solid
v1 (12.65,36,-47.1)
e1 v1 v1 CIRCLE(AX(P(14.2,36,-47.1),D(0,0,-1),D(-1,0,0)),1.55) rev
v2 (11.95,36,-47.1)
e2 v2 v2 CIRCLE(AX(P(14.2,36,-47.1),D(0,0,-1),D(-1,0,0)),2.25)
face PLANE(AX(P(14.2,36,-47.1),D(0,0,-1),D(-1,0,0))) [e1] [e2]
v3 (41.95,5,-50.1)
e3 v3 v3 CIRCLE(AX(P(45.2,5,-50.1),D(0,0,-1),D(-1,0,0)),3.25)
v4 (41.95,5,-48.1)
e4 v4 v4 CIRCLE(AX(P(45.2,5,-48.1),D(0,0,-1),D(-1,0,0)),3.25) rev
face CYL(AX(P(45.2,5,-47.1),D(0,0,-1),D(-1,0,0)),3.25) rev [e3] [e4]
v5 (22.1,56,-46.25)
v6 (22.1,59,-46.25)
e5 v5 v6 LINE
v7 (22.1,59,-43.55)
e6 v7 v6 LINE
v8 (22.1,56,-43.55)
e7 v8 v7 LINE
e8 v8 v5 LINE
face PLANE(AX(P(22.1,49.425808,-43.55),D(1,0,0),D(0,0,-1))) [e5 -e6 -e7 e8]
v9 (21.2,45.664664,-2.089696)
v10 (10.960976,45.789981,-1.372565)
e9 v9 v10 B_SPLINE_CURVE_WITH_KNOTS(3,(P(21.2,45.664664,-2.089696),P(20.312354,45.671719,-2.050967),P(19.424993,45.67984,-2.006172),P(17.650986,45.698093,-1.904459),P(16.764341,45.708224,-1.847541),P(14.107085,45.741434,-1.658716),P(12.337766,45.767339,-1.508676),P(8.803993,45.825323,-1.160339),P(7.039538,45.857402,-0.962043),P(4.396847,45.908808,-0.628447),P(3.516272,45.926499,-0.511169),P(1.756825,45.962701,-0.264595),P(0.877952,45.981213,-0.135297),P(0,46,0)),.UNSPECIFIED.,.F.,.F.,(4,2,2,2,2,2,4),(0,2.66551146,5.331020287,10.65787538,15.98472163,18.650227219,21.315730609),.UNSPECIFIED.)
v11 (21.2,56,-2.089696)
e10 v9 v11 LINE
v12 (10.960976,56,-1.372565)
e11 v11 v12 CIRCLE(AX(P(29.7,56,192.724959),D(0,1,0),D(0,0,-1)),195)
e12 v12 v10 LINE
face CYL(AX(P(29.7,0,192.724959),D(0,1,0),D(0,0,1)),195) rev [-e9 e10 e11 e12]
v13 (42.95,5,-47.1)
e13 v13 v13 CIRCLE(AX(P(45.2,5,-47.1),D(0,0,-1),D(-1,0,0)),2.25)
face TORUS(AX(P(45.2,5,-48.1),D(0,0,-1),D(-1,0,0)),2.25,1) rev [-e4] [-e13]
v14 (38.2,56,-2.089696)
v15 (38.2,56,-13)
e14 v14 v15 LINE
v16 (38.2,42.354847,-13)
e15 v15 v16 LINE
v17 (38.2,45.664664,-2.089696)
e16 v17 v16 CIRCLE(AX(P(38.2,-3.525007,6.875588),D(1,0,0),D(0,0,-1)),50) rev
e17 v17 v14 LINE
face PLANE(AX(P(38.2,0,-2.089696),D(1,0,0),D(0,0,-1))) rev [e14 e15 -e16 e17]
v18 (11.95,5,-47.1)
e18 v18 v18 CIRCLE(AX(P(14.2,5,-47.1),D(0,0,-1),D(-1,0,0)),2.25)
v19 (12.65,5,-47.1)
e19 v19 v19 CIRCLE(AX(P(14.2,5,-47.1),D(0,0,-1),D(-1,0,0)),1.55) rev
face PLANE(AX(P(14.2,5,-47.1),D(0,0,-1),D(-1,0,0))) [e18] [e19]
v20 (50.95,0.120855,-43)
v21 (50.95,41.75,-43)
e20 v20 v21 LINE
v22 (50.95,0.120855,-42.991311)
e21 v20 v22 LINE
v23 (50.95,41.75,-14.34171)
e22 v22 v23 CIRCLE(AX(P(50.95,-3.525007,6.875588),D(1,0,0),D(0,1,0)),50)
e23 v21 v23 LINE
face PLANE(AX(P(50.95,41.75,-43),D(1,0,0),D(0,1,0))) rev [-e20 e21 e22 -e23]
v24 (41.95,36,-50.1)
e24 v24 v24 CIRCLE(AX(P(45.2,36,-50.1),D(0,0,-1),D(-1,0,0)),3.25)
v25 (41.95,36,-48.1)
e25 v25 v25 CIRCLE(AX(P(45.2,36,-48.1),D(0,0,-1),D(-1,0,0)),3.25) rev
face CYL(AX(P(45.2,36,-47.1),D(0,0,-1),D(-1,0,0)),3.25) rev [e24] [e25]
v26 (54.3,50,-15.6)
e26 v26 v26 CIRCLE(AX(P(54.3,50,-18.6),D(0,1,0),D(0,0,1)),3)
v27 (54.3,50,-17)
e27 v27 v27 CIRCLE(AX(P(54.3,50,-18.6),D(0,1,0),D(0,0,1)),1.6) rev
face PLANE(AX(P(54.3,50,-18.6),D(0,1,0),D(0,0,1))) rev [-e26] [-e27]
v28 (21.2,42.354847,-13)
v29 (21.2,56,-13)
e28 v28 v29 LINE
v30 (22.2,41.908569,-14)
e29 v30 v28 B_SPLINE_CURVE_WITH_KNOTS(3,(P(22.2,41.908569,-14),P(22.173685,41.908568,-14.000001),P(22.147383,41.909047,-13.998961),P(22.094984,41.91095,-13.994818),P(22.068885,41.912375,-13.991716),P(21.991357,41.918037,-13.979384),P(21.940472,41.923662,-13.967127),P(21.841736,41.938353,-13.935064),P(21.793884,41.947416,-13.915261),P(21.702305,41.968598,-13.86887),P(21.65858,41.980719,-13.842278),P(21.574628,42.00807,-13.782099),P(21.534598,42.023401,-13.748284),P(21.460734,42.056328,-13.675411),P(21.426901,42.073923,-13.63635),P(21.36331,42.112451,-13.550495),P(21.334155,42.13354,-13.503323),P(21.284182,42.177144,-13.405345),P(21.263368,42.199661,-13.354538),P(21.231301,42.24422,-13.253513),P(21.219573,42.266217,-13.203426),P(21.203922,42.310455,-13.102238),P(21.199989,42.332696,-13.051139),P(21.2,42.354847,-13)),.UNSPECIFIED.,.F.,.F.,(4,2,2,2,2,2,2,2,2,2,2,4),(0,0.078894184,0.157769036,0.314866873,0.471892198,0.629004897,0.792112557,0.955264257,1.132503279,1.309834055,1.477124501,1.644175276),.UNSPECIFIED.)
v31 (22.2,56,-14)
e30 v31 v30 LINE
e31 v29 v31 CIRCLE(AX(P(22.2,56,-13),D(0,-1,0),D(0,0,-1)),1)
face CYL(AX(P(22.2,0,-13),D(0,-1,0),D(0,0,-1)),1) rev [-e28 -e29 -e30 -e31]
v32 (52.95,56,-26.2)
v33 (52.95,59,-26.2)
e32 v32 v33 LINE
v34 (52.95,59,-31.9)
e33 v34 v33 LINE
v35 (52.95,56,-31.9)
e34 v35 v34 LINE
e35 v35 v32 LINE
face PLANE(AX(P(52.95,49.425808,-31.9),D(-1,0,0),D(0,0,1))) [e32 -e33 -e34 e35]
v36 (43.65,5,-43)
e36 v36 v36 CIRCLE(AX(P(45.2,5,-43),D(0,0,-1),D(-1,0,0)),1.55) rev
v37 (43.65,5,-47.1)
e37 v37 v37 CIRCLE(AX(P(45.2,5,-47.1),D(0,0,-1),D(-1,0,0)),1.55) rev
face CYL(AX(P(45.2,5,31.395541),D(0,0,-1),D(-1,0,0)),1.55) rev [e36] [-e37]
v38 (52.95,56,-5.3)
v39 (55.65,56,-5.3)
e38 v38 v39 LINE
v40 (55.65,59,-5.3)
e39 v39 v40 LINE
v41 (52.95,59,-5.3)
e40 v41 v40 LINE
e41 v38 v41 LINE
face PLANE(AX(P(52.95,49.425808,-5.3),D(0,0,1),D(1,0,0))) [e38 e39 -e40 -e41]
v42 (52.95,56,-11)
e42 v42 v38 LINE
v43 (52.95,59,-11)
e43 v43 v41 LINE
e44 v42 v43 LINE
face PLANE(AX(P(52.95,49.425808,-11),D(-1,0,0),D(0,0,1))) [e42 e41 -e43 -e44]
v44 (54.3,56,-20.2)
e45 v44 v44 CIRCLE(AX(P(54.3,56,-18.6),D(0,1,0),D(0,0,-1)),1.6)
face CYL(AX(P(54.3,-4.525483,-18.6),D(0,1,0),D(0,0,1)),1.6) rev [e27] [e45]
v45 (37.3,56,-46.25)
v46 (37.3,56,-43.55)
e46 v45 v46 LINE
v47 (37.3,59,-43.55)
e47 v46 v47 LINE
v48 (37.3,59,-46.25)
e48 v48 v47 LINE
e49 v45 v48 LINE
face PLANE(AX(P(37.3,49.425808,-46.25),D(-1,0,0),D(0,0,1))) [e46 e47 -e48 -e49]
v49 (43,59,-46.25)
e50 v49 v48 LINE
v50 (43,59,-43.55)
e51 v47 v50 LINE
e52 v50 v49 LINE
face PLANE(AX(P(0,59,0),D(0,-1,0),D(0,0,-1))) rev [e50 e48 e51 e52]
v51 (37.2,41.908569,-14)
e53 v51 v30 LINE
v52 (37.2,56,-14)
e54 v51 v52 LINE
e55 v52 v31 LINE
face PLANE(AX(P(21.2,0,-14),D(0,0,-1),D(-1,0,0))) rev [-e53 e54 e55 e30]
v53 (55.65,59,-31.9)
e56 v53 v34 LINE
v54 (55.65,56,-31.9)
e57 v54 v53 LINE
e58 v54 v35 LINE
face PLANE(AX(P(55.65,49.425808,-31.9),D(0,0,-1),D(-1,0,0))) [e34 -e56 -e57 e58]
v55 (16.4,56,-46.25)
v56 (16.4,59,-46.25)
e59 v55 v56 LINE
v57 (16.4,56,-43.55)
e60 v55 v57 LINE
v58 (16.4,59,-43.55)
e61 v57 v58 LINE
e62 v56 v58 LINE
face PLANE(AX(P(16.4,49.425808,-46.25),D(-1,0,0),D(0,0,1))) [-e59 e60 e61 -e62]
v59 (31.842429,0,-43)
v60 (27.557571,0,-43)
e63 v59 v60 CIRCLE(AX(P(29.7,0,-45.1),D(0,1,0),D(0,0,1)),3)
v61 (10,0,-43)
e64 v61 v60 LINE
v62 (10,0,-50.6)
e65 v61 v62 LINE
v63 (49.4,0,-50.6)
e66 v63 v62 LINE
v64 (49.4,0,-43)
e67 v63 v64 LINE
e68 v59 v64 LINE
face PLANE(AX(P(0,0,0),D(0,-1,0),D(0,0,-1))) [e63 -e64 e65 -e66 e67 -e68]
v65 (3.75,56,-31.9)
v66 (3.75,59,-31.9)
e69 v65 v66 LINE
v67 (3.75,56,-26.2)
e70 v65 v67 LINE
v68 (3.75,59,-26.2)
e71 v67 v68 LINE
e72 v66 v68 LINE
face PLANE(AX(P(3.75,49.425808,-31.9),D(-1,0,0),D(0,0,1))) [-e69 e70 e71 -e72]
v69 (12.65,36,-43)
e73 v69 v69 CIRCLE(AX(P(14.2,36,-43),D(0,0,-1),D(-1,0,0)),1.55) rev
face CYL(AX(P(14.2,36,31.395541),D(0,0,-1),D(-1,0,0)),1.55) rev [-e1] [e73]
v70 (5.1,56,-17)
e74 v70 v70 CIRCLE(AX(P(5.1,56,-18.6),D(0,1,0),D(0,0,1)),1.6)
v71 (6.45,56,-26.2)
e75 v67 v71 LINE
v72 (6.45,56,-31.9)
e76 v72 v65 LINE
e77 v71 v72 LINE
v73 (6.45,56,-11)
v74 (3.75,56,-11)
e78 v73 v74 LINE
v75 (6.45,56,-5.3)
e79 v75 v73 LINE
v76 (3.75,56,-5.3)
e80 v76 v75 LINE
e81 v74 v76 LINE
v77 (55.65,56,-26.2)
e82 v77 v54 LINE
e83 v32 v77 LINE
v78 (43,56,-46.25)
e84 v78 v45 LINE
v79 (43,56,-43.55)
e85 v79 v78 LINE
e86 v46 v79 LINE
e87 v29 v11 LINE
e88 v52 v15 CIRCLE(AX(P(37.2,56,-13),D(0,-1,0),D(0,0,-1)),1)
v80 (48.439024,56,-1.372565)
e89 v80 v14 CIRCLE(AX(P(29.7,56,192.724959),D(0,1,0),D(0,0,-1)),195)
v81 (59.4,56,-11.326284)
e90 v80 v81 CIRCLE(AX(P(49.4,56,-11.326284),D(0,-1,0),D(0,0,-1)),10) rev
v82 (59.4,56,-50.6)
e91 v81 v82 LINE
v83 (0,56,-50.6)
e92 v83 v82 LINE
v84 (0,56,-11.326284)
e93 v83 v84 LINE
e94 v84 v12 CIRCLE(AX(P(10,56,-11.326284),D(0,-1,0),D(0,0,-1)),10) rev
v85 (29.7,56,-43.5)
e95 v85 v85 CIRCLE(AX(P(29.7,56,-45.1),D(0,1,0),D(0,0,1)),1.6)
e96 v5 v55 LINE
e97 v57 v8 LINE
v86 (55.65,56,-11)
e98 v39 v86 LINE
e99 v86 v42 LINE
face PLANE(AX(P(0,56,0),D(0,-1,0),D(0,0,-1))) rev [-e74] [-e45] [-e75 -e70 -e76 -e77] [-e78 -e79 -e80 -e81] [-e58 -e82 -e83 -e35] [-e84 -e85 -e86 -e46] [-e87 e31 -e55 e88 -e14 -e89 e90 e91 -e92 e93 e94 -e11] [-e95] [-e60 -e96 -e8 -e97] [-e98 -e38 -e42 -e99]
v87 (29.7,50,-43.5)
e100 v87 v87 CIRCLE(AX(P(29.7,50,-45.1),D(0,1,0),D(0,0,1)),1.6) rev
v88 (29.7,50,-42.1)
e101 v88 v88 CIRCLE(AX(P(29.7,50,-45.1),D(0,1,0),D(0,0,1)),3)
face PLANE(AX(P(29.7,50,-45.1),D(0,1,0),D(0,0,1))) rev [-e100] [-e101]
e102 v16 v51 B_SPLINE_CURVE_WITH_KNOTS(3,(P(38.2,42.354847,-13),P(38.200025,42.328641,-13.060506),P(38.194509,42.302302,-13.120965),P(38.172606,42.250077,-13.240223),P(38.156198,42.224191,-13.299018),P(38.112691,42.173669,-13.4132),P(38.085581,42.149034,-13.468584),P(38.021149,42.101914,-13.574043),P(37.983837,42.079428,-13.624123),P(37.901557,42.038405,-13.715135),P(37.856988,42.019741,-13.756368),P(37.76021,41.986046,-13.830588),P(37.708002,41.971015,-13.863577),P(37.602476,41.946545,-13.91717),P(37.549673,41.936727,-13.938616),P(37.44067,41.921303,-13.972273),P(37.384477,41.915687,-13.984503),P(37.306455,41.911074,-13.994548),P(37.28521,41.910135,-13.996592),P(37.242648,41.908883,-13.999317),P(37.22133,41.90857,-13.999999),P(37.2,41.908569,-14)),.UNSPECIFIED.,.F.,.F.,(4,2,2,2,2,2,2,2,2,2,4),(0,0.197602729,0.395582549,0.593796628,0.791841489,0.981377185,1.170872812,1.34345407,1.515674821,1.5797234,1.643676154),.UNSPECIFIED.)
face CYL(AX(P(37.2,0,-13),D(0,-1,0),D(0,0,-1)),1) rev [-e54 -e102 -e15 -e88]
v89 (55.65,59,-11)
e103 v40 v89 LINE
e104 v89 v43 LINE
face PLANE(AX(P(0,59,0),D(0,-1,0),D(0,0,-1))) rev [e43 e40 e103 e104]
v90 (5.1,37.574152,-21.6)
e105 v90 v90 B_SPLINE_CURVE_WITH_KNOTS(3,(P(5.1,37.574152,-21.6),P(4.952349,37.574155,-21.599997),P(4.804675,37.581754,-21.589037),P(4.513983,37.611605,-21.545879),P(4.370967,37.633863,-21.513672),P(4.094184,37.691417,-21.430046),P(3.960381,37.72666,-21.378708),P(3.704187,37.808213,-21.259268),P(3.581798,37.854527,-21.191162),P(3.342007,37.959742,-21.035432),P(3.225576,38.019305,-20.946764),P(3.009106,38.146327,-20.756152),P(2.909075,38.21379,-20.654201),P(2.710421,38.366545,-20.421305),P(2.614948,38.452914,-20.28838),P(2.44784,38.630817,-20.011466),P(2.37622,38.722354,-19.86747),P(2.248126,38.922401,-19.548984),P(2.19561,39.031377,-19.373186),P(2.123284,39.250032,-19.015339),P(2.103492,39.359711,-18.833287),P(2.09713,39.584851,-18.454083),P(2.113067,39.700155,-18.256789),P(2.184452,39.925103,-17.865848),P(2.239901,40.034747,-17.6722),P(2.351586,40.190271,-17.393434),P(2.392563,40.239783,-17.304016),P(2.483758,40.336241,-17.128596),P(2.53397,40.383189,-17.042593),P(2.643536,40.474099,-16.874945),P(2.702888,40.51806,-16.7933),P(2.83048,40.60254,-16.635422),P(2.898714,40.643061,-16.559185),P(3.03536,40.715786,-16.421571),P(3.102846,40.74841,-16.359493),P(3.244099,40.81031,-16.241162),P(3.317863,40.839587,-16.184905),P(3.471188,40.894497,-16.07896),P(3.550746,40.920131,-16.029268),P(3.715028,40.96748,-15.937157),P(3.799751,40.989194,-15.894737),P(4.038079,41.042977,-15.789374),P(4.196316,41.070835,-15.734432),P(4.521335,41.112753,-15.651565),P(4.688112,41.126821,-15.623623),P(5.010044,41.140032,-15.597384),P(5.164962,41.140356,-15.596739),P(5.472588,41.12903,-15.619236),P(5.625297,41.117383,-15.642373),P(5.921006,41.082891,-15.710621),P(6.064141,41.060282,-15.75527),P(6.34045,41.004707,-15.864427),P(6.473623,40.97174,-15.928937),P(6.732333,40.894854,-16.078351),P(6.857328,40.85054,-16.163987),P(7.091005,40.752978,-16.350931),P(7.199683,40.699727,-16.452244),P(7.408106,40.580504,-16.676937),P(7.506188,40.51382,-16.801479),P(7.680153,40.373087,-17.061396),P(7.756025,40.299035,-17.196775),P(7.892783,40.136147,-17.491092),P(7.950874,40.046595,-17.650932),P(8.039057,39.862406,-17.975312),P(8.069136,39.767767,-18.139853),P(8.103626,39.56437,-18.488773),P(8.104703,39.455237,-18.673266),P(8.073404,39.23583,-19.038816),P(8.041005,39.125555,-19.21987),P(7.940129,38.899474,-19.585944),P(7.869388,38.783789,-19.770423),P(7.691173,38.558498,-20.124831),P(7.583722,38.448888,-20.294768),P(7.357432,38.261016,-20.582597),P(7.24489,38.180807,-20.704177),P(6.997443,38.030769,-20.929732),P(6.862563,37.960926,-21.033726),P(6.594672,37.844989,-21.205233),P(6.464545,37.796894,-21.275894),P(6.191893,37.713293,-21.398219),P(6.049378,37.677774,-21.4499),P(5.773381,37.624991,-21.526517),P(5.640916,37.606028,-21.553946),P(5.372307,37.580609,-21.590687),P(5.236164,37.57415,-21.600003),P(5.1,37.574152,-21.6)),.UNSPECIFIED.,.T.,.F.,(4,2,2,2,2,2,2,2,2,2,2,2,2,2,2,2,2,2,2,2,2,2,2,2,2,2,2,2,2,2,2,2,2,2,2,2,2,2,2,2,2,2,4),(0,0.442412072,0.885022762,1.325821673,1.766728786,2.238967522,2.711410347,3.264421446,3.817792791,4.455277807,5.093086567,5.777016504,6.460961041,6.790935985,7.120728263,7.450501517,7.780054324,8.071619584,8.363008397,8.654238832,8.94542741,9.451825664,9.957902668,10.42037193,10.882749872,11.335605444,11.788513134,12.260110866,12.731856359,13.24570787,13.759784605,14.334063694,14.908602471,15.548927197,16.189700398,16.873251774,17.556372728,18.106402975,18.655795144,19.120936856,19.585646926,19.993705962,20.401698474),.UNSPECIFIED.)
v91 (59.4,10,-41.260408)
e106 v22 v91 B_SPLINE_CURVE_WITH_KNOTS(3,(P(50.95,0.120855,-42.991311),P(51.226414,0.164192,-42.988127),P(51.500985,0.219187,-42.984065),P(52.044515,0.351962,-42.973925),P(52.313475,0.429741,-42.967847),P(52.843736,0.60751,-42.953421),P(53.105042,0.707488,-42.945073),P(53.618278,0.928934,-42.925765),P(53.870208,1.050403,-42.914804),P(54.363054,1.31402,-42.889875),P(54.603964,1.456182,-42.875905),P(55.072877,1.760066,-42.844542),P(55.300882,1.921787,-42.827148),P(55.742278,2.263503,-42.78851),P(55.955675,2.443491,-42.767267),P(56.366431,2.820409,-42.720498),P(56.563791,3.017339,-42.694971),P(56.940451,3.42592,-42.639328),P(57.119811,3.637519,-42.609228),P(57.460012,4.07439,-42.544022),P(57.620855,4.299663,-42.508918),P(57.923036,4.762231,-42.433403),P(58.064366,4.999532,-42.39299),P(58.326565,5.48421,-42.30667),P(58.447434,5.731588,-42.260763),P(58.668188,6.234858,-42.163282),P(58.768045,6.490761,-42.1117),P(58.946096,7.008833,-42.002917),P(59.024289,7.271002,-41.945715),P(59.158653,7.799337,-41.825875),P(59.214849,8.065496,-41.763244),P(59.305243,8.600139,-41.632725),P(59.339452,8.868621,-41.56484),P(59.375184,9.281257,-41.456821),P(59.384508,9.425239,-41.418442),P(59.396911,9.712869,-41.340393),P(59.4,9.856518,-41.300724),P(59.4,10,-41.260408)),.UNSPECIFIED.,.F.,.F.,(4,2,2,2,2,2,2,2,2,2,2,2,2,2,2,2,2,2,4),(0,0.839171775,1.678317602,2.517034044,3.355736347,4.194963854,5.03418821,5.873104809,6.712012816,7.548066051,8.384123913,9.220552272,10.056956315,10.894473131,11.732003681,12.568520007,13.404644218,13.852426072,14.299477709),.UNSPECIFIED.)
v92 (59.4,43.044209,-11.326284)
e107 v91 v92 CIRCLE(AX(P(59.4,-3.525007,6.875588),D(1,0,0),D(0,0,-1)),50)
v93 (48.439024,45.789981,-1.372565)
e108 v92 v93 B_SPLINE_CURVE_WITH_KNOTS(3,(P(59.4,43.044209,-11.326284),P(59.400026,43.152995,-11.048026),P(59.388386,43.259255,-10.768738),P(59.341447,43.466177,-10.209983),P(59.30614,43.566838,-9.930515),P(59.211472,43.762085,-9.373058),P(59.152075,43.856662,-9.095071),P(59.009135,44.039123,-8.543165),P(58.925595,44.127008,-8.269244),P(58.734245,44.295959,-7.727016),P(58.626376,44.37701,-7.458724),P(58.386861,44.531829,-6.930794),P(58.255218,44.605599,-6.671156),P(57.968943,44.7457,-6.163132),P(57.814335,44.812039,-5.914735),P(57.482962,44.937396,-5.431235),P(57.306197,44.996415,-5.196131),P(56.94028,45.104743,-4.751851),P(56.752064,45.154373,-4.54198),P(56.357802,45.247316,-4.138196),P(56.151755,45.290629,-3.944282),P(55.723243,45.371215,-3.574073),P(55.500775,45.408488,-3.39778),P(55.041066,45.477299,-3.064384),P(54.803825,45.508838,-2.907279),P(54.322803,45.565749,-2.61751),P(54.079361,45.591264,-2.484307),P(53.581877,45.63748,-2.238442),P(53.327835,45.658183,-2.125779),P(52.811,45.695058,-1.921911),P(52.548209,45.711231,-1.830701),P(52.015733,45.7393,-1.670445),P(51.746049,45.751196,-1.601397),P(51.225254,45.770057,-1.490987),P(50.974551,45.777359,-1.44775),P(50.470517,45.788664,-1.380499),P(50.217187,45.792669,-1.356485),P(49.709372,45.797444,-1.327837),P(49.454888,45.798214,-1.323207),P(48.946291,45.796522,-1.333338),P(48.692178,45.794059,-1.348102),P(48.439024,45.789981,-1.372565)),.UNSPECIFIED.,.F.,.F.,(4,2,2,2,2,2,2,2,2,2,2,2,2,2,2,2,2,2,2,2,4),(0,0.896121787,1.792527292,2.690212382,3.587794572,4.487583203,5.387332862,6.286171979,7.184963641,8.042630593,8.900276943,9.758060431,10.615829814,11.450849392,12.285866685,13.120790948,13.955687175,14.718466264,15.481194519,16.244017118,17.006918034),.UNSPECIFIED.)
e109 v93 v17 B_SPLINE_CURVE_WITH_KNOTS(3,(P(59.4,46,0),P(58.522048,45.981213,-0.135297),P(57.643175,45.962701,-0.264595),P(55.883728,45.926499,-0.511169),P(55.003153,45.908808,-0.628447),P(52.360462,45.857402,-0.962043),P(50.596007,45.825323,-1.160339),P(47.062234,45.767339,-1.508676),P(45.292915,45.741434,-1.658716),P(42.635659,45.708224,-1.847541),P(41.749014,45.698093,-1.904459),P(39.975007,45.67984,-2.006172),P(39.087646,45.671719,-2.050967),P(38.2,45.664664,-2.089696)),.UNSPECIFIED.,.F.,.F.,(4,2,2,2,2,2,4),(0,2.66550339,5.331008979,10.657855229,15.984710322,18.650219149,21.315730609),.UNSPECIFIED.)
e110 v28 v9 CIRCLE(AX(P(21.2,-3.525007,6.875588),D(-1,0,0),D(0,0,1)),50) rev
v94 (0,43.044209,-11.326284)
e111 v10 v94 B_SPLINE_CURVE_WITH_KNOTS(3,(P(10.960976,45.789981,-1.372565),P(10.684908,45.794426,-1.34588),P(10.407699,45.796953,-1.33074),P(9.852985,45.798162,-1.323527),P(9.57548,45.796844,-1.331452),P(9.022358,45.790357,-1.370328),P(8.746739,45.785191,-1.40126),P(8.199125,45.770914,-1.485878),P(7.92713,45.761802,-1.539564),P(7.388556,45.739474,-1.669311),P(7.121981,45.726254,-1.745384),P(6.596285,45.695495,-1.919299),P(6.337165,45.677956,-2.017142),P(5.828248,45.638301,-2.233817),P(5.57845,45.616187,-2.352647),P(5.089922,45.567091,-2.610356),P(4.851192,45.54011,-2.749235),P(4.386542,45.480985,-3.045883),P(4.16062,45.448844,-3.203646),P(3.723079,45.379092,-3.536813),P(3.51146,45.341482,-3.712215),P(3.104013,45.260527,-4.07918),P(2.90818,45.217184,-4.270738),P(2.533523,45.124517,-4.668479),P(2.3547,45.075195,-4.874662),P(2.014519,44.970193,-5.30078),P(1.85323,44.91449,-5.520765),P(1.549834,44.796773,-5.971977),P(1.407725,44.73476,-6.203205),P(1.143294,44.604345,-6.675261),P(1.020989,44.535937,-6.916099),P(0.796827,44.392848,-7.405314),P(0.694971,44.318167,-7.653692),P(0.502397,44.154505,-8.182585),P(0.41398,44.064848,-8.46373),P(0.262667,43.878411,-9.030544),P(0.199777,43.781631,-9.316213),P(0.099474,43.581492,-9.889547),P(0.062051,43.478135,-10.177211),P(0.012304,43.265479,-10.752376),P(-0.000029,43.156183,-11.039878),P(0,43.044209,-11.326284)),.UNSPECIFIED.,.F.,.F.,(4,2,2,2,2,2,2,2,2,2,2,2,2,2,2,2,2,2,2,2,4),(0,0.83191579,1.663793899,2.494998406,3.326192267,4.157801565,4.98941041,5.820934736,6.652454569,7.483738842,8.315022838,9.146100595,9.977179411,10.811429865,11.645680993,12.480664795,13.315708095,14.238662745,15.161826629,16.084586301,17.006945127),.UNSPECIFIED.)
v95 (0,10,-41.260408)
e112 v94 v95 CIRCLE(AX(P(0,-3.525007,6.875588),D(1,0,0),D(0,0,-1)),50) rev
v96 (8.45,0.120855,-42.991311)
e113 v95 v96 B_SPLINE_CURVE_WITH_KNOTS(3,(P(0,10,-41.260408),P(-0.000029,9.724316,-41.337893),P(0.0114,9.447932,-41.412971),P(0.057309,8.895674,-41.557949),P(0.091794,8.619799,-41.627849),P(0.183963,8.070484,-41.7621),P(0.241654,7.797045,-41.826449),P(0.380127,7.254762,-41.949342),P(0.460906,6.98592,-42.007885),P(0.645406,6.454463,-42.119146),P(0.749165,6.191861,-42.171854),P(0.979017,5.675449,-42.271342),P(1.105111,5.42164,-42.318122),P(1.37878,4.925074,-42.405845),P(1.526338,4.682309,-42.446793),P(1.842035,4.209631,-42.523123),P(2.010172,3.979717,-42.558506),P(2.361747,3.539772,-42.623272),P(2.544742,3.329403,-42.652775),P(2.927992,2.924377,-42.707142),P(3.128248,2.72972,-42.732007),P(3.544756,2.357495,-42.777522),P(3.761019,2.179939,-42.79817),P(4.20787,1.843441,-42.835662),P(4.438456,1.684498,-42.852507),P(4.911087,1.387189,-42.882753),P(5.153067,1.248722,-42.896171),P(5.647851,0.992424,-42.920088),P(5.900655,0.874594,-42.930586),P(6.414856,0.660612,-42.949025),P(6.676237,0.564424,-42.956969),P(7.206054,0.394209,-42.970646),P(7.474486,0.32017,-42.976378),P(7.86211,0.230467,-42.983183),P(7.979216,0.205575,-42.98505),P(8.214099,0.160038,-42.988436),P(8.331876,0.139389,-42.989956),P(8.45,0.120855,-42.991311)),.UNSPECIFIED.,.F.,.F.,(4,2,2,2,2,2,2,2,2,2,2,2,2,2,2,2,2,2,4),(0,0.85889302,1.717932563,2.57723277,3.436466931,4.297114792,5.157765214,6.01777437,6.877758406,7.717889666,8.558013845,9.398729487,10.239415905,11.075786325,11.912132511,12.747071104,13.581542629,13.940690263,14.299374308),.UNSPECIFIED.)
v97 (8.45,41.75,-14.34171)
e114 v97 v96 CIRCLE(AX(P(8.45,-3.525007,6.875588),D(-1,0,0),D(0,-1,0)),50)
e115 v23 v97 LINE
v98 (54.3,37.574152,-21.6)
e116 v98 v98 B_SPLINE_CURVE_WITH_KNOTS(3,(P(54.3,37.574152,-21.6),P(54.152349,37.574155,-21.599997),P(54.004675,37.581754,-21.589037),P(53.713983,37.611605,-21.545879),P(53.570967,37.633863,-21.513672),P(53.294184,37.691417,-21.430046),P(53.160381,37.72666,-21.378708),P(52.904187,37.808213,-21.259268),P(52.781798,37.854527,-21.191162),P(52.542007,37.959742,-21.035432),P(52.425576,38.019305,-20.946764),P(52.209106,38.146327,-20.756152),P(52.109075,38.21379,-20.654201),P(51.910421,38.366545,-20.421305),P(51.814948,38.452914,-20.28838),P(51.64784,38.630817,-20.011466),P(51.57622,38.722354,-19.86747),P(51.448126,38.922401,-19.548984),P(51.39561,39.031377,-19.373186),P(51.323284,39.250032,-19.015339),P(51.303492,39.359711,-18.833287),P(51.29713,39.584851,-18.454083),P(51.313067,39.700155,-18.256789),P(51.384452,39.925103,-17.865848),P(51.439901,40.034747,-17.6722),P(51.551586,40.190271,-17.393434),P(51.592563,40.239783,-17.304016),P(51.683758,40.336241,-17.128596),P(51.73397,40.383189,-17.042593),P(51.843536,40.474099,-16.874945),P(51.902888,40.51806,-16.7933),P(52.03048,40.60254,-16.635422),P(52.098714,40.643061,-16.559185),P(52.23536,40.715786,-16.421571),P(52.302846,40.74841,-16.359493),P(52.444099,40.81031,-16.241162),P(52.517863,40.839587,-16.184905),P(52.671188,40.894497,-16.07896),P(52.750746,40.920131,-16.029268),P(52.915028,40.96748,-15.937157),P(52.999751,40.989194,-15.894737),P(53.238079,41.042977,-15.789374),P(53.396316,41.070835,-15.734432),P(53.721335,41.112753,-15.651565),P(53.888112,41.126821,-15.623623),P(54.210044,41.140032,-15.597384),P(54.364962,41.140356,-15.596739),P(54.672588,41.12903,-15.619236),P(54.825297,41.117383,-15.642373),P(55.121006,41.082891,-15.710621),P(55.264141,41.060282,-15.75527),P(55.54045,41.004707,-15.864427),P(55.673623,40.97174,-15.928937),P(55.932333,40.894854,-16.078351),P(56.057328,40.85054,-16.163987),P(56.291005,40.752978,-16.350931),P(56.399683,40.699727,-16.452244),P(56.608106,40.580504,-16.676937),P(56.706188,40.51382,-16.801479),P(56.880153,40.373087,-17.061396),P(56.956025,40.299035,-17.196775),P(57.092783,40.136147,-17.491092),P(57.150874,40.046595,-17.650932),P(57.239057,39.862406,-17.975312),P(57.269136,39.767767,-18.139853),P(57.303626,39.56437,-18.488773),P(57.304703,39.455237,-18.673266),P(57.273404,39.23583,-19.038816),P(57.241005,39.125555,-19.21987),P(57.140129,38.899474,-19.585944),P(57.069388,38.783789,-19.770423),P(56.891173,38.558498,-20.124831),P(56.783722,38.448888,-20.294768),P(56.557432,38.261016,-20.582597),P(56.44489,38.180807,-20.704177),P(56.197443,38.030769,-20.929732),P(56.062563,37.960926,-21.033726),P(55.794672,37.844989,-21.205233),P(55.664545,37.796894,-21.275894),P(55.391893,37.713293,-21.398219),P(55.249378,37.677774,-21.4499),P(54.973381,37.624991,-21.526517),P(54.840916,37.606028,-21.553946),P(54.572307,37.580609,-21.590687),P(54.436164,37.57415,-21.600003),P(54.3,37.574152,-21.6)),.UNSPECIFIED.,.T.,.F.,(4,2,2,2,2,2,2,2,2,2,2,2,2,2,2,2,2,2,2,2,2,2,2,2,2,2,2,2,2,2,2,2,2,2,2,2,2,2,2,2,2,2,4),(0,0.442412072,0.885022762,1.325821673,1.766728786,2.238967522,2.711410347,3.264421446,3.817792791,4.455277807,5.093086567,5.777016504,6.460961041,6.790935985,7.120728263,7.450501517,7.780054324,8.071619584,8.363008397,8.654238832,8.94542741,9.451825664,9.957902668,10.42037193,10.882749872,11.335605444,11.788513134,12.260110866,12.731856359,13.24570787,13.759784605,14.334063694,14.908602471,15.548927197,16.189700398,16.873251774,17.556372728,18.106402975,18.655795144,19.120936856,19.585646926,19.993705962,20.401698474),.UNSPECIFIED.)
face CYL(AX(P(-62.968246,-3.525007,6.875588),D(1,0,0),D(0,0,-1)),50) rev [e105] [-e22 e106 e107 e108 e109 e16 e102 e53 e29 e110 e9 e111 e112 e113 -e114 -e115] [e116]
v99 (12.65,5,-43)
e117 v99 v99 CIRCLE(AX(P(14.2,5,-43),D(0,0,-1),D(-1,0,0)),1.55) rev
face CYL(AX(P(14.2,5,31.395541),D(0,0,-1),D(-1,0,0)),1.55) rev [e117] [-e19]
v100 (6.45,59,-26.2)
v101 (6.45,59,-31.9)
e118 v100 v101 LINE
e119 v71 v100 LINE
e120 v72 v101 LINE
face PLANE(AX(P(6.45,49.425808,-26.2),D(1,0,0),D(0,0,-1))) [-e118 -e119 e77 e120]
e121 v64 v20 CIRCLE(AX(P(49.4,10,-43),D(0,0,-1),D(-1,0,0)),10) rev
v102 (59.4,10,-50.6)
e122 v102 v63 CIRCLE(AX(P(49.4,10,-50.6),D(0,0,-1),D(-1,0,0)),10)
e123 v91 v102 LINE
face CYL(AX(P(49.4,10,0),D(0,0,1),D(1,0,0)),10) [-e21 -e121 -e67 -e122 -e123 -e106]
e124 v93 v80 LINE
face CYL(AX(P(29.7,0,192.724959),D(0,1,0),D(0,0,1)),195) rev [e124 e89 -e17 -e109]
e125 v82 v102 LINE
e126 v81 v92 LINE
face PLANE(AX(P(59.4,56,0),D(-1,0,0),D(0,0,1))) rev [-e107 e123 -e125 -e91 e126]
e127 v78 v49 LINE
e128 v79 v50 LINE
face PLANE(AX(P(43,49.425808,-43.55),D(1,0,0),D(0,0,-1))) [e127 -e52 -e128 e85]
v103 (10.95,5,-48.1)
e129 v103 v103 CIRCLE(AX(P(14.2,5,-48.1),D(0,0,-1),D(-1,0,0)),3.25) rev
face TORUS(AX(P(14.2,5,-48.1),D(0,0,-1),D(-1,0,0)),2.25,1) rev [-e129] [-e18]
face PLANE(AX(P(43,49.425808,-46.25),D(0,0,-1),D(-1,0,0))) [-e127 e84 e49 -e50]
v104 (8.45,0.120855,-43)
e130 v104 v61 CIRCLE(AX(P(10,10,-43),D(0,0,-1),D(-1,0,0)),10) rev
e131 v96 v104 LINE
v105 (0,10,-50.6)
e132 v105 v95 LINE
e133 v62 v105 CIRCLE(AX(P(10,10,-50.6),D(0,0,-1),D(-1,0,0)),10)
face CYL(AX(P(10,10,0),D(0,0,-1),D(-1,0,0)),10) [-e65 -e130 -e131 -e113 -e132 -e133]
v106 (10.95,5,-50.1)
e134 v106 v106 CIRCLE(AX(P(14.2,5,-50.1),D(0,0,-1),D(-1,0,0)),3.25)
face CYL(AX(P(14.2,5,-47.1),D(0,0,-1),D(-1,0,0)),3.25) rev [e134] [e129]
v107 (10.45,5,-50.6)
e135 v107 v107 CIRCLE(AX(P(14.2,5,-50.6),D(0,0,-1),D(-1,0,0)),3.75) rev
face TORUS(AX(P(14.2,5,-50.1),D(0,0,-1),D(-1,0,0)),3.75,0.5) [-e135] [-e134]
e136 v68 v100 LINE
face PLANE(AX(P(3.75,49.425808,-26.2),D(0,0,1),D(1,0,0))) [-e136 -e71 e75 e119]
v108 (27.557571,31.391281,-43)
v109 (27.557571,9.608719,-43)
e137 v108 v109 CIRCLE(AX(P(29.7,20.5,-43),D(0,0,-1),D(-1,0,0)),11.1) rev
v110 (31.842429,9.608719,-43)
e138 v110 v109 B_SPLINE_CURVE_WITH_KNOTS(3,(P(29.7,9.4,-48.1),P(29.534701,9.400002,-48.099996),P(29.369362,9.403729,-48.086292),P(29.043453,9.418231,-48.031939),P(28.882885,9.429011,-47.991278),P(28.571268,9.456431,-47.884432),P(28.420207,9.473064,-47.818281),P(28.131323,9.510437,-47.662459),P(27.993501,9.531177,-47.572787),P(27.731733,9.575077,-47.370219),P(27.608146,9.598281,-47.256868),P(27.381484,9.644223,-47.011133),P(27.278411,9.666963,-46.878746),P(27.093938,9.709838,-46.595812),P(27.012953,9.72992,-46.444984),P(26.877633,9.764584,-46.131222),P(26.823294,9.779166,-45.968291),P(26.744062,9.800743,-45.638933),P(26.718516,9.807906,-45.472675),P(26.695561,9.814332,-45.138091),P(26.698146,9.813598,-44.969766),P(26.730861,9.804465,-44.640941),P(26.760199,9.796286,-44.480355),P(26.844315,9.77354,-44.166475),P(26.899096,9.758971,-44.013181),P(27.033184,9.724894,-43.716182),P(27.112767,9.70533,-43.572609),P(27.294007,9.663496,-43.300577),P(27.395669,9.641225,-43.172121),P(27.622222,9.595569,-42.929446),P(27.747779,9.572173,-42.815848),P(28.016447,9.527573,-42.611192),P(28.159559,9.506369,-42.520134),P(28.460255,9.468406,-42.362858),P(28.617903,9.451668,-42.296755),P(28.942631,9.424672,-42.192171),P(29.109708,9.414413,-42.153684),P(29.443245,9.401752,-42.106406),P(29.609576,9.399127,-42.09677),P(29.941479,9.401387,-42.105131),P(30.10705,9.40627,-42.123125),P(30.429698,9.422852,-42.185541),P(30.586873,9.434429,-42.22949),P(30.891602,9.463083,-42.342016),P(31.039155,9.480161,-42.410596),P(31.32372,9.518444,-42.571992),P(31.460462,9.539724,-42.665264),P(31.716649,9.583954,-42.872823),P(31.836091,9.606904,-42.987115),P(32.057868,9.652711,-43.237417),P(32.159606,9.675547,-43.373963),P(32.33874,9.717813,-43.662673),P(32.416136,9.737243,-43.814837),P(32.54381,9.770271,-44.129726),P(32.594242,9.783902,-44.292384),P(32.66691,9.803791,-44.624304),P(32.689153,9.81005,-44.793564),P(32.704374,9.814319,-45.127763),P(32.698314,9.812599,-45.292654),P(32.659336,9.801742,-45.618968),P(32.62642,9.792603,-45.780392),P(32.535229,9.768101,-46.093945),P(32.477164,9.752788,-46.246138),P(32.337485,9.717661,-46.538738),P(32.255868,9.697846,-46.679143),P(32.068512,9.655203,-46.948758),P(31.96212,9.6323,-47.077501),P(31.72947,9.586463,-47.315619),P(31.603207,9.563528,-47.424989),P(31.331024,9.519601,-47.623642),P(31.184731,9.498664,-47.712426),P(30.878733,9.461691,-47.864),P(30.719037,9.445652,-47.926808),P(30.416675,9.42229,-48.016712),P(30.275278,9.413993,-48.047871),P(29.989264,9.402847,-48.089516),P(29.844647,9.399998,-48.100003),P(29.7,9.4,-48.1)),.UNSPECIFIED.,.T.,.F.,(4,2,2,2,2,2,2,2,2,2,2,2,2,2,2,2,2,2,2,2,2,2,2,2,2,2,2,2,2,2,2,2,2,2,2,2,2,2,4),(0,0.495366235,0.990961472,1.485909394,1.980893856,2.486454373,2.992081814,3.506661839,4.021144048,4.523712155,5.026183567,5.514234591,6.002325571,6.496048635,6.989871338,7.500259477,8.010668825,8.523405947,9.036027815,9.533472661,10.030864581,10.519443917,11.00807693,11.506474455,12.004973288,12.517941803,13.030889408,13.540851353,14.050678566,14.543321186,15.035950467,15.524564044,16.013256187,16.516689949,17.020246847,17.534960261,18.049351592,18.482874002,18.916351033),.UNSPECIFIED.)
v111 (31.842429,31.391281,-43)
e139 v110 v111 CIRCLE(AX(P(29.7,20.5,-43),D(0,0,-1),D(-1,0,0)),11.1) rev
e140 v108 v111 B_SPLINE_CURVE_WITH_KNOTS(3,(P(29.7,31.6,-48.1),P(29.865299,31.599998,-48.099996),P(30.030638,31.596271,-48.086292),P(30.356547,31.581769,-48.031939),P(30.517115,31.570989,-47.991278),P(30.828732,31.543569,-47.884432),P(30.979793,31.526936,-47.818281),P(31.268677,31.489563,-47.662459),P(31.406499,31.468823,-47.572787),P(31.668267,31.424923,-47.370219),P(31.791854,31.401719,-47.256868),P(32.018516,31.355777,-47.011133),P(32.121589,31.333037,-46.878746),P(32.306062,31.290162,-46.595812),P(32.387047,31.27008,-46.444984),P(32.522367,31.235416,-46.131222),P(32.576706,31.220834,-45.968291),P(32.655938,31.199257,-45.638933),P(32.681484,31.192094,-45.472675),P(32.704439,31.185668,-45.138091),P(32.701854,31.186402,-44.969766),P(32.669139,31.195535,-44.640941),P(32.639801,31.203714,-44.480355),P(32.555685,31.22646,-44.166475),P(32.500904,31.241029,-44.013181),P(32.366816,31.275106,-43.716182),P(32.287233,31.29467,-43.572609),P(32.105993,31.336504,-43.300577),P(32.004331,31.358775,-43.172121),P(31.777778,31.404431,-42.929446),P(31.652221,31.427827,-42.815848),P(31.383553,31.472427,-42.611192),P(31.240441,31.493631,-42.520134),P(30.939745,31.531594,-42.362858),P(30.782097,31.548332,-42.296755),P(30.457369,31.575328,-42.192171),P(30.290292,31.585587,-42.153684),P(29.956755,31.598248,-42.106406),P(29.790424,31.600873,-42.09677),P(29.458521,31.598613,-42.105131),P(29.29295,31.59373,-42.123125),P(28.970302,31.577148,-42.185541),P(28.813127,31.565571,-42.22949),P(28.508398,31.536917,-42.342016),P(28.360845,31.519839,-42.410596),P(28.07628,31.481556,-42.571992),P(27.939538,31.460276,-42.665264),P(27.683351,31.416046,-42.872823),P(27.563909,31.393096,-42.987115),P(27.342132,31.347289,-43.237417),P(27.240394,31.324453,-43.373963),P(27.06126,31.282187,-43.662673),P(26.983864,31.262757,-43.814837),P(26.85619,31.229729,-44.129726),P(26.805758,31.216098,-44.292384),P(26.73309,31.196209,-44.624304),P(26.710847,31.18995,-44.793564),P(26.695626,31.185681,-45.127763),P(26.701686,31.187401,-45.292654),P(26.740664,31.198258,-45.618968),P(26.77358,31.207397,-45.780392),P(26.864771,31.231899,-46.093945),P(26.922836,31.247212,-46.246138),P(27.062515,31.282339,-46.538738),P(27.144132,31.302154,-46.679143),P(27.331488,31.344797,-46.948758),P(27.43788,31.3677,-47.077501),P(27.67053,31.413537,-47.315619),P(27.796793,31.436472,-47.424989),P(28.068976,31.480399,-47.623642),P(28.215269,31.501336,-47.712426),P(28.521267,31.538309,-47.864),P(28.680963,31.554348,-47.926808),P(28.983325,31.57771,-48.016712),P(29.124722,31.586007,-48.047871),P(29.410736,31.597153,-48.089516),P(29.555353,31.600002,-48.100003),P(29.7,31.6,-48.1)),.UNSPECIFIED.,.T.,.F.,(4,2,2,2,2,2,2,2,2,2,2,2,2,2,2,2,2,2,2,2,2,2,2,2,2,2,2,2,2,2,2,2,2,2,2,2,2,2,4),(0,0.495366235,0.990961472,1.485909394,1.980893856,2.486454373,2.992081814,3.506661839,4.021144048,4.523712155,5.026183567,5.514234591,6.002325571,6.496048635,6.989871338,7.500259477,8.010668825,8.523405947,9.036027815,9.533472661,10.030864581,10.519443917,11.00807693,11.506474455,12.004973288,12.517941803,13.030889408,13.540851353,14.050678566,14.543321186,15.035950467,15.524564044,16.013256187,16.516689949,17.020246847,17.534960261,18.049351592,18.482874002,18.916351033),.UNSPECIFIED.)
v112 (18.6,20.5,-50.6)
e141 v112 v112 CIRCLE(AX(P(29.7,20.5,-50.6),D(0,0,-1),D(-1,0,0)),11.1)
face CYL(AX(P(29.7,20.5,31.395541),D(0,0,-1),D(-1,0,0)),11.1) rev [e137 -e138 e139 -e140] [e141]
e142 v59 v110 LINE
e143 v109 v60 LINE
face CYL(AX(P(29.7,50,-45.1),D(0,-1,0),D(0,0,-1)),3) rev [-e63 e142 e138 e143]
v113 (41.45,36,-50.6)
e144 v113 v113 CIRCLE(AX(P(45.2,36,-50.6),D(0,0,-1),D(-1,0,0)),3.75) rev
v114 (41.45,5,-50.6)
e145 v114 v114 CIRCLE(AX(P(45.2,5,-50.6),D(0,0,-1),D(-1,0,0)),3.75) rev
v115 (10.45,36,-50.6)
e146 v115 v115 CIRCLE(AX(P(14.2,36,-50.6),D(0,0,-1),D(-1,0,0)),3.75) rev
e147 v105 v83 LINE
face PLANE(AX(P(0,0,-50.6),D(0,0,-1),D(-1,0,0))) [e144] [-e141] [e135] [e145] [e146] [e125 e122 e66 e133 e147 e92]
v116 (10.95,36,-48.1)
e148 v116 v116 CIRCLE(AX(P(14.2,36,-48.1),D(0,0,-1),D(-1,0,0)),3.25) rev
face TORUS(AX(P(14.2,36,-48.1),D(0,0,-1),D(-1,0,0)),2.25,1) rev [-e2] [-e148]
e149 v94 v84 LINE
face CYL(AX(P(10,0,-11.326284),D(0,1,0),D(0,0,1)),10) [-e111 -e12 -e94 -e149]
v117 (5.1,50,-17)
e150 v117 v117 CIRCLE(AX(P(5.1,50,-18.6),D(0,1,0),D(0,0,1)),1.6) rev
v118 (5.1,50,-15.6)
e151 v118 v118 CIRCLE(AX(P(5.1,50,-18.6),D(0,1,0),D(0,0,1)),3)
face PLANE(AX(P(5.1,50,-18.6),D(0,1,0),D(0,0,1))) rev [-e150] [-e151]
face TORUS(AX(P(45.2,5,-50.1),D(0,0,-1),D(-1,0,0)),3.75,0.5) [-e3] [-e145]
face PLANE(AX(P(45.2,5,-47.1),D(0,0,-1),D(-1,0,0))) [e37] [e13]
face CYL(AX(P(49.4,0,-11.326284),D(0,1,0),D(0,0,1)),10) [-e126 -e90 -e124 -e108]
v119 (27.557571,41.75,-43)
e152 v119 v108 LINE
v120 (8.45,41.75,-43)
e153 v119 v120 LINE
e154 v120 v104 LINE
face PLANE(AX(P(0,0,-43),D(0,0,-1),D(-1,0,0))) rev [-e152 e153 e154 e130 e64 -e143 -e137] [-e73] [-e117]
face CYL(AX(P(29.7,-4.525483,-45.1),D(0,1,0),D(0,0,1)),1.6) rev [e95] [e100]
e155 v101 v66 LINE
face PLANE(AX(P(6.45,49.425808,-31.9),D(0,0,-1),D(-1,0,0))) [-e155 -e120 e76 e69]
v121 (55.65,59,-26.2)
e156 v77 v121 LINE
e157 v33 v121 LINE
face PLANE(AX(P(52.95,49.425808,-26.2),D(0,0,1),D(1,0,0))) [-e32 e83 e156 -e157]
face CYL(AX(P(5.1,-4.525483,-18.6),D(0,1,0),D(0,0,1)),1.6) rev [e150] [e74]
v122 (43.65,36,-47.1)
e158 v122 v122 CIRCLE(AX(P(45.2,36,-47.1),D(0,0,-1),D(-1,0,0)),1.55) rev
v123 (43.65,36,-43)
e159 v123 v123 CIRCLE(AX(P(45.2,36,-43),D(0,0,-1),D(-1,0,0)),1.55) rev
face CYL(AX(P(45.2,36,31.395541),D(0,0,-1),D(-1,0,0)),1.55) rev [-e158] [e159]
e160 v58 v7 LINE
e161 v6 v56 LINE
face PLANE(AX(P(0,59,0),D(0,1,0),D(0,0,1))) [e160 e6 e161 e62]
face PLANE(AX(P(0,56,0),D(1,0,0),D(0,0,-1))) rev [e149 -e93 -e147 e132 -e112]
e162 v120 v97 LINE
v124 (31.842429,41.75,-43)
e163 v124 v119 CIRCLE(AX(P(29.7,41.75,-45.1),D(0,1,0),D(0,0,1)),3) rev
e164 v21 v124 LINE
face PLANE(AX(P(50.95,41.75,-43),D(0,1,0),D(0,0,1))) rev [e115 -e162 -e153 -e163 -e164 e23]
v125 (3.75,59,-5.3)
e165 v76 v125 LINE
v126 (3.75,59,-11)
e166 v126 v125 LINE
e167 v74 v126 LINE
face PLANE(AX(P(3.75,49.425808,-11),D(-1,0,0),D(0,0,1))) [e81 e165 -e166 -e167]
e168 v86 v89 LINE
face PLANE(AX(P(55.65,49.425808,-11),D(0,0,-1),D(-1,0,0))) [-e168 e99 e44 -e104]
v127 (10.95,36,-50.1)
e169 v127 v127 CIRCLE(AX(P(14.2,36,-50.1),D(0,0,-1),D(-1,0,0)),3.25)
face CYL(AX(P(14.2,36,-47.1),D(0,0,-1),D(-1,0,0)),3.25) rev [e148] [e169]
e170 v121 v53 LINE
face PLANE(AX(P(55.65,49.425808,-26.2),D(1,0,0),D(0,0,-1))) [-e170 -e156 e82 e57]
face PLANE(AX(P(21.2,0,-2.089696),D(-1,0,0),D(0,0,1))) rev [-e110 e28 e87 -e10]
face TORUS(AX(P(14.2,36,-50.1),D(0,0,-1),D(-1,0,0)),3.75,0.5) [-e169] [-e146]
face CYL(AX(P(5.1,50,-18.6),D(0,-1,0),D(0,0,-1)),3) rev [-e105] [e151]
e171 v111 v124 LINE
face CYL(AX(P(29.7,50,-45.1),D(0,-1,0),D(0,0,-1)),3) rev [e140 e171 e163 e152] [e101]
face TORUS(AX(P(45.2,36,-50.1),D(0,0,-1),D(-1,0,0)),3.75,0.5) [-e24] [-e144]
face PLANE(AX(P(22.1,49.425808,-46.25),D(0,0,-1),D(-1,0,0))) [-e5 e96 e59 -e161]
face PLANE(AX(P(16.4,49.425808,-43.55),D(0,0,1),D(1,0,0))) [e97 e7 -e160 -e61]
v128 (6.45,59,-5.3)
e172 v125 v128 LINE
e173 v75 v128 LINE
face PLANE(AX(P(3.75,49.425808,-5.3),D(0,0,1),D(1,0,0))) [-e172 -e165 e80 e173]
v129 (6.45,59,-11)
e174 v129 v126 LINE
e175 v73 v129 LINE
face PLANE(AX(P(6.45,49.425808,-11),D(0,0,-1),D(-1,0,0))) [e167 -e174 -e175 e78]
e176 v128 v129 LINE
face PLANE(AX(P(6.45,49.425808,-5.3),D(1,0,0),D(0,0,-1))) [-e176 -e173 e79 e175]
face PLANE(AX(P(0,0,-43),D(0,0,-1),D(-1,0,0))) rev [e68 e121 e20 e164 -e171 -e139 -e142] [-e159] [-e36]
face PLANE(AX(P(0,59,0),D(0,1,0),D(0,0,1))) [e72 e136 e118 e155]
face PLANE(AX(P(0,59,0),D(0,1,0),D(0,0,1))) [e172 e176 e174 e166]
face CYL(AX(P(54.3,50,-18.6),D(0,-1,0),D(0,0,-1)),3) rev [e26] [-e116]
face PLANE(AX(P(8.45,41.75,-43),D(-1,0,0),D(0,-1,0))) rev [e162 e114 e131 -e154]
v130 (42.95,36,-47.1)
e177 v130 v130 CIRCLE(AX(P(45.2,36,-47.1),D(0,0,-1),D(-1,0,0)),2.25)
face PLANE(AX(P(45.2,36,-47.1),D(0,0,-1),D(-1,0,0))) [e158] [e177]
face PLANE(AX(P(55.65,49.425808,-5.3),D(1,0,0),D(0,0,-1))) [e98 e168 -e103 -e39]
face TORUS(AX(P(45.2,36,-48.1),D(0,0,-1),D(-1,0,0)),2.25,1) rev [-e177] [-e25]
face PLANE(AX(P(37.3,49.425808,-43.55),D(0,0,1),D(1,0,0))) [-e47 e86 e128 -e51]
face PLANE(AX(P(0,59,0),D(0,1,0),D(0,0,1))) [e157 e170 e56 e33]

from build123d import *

# Parameters (mm, degrees)
CROQUIS1_W              = 59.4
CROQUIS1_H              = 48.6
SALIENTE_EXTRUIR1_DEPTH = 56
CROQUIS2_W              = 5.9
CROQUIS2_H              = 2.9
CROQUIS2_W_2            = 2.9
CROQUIS2_H_2            = 5.9
SALIENTE_EXTRUIR2_DEPTH = 3
CROQUIS3_R              = 1.6
CORTAR_EXTRUIR1_DEPTH   = 56
CROQUIS4_R              = 11.1
CROQUIS4_R_2            = 1.55
CORTAR_EXTRUIR2_DEPTH   = 48.6
CROQUIS5_W              = 42.5
CROQUIS5_H              = 42.5
CORTAR_EXTRUIR3_DEPTH   = 43
CROQUIS7_R              = 3
CORTAR_EXTRUIR4_DEPTH   = 50
CORTAR_EXTRUIR5_REACH   = 98.806
CORTAR_EXTRUIR6_DEPTH   = 96.006947287
SALIENTE_EXTRUIR3_START = 2
CROQUIS10_W             = 59.4
CROQUIS10_H             = 56
CROQUIS10_R             = 1.55
CROQUIS10_R_2           = 11.1
SALIENTE_EXTRUIR3_DEPTH = 2
REDONDEO1_R             = 10
REDONDEO2_R             = 10
REDONDEO3_R             = 1
CROQUIS11_R             = 3.25
CORTAR_EXTRUIR7_DEPTH   = 3.5
REDONDEO4_R             = 1
CROQUIS12_W             = 5.9
CROQUIS12_H             = 2.9
CROQUIS12_W_2           = 5.7
CROQUIS12_H_2           = 2.7
CROQUIS12_W_3           = 2.9
CROQUIS12_H_3           = 5.9
CROQUIS12_W_4           = 2.7
CROQUIS12_H_4           = 5.7
CORTAR_EXTRUIR9_DEPTH   = 3
REDONDEO5_R             = 0.5


with BuildPart() as part:
    # Croquis1 → Saliente-Extruir1 (new body)
    with BuildSketch(Plane(origin=(0, 0, 0), x_dir=(1, 0, 0), z_dir=(0, 1, 0))):
        with Locations((29.7, 24.3)):
            Rectangle(CROQUIS1_W, CROQUIS1_H)
    extrude(amount=SALIENTE_EXTRUIR1_DEPTH)

    # Croquis2 → Saliente-Extruir2 (add)
    with BuildSketch(Plane(origin=(0, 56, 0), x_dir=(1, 0, 0), z_dir=(0, 1, 0))):
        with Locations((40.15, 44.9)):
            Rectangle(CROQUIS2_W, CROQUIS2_H)
        with Locations((19.25, 44.9)):
            Rectangle(CROQUIS2_W, CROQUIS2_H)
        with Locations((5.1, 29.05)):
            Rectangle(CROQUIS2_W_2, CROQUIS2_H_2)
        with Locations((5.1, 8.15)):
            Rectangle(CROQUIS2_W_2, CROQUIS2_H_2)
        with Locations((54.3, 8.15)):
            Rectangle(CROQUIS2_W_2, CROQUIS2_H_2)
        with Locations((54.3, 29.05)):
            Rectangle(CROQUIS2_W_2, CROQUIS2_H_2)
    extrude(amount=SALIENTE_EXTRUIR2_DEPTH)

    # Croquis3 → Cortar-Extruir1 (cut)
    with BuildSketch(Plane(origin=(0, 56, 0), x_dir=(1, 0, 0), z_dir=(0, 1, 0))):
        with Locations(Location((29.7, 45.1, 0), (0, 0, 270))):
            Circle(CROQUIS3_R)
        with Locations(Location((5.1, 18.6, 0), (0, 0, 270))):
            Circle(CROQUIS3_R)
        with Locations(Location((54.3, 18.6, 0), (0, 0, 90))):
            Circle(CROQUIS3_R)
    extrude(amount=-CORTAR_EXTRUIR1_DEPTH, mode=Mode.SUBTRACT)

    # Croquis4 → Cortar-Extruir2 (cut)
    with BuildSketch(Plane(origin=(0, 0, -48.6), x_dir=(-1, 0, 0), z_dir=(0, 0, -1))):
        with Locations((-29.7, 20.5)):
            Circle(CROQUIS4_R)
        with Locations((-45.2, 36)):
            Circle(CROQUIS4_R_2)
        with Locations((-14.2, 36)):
            Circle(CROQUIS4_R_2)
        with Locations((-45.2, 5)):
            Circle(CROQUIS4_R_2)
        with Locations((-14.2, 5)):
            Circle(CROQUIS4_R_2)
    extrude(amount=-CORTAR_EXTRUIR2_DEPTH, mode=Mode.SUBTRACT)

    # Croquis5 → Cortar-Extruir3 (cut)
    with BuildSketch(Plane.XY):
        with Locations((29.7, 20.5)):
            Rectangle(CROQUIS5_W, CROQUIS5_H)
    extrude(amount=-CORTAR_EXTRUIR3_DEPTH, mode=Mode.SUBTRACT)

    # Croquis7 → Cortar-Extruir4 (cut)
    with BuildSketch(Plane(origin=(0, 0, 0), x_dir=(1, 0, 0), z_dir=(0, 1, 0))):
        with Locations(Location((29.7, 45.1, 0), (0, 0, 224.427004001))):
            Circle(CROQUIS7_R)
        with Locations(Location((5.1, 18.6, 0), (0, 0, 270))):
            Circle(CROQUIS7_R)
        with Locations(Location((54.3, 18.6, 0), (0, 0, 270))):
            Circle(CROQUIS7_R)
    extrude(amount=CORTAR_EXTRUIR4_DEPTH, mode=Mode.SUBTRACT)

    # Cortar-Extruir5: up to this face of the body (flat: up to its plane)
    cortar_extruir5_end = Plane(part.part.faces().sort_by_distance((0, 28, -24.3))[0])
    # Croquis8 → Cortar-Extruir5 (cut, up to the picked face)
    with BuildSketch(Plane(origin=(59.4, 0, 0), x_dir=(0, 0, -1), z_dir=(1, 0, 0)), mode=Mode.PRIVATE) as cortar_extruir5_sk1:
        with BuildLine():
            Line((43, 0), (0, 0))
            Line((0, 0), (0, 46))
            ThreePointArc((0, 46), (29.650758467, 30.619187262), (43, 0))
        make_face()
    cortar_extruir5_tool1 = split(extrude(cortar_extruir5_sk1.sketch, amount=-CORTAR_EXTRUIR5_REACH, mode=Mode.PRIVATE), bisect_by=cortar_extruir5_end, keep=Keep.BOTH, mode=Mode.PRIVATE)
    add(cortar_extruir5_tool1.solids().sort_by(Axis((59.4, 18.844138, -17.750957), (-1, 0, 0)))[0], mode=Mode.SUBTRACT)

    # Croquis9 → Cortar-Extruir6 (cut, through all)
    with BuildSketch(Plane(origin=(0, 56, 0), x_dir=(1, 0, 0), z_dir=(0, 1, 0))):
        with BuildLine():
            Line((0, 0), (59.4, 0))
            ThreePointArc((59.4, 0), (48.828557379, 1.334563088), (38.2, 2.089696043))
            Line((38.2, 2.089696043), (38.2, 14))
            Line((38.2, 14), (21.2, 14))
            Line((21.2, 14), (21.2, 2.089696043))
            ThreePointArc((21.2, 2.089696043), (10.571442621, 1.334563088), (0, 0))
        make_face()
    extrude(amount=-CORTAR_EXTRUIR6_DEPTH, mode=Mode.SUBTRACT)

    # Croquis10 → Saliente-Extruir3 (add)
    with BuildSketch(Plane(origin=(0, 0, -48.6), x_dir=(-1, 0, 0), z_dir=(0, 0, -1)).offset(SALIENTE_EXTRUIR3_START)):
        with Locations((-29.7, 28)):
            Rectangle(CROQUIS10_W, CROQUIS10_H)
        with Locations((-14.2, 36)):
            Circle(CROQUIS10_R, mode=Mode.SUBTRACT)
        with Locations((-45.2, 36)):
            Circle(CROQUIS10_R, mode=Mode.SUBTRACT)
        with Locations((-45.2, 5)):
            Circle(CROQUIS10_R, mode=Mode.SUBTRACT)
        with Locations((-29.7, 20.5)):
            Circle(CROQUIS10_R_2, mode=Mode.SUBTRACT)
        with Locations((-14.2, 5)):
            Circle(CROQUIS10_R, mode=Mode.SUBTRACT)
    extrude(amount=-SALIENTE_EXTRUIR3_DEPTH)

    # Redondeo1
    # the kernel refuses this fillet: 10 mm, written as the material it takes off along each edge
    with BuildSketch(Plane(origin=(59.4, 0, -18), x_dir=(0, 1, 0), z_dir=(0, 0, -1)), Plane(origin=(0, 0, -18), x_dir=(1, 0, 0), z_dir=(0, 0, -1))) as redondeo1_piece_1:
        with BuildLine():
            CenterArc((REDONDEO1_R, -REDONDEO1_R), REDONDEO1_R, 90, 90)
            Line((0, -REDONDEO1_R), (0, 0))
            Line((0, 0), (REDONDEO1_R, 0))
        make_face()
    extrude(amount=57.6, mode=Mode.SUBTRACT)

    # Redondeo2
    redondeo2_edges = [part.edges().sort_by_distance(p)[0] for p in [
        (0, 51, 0),
        (59.4, 51, 0),
    ]]
    fillet(redondeo2_edges, radius=REDONDEO2_R)

    # Redondeo3
    redondeo3_edges = [part.edges().sort_by_distance(p)[0] for p in [
        (21.2, 48.954284551, -14),
        (38.2, 48.954284551, -14),
    ]]
    fillet(redondeo3_edges, radius=REDONDEO3_R)

    # Croquis11 → Cortar-Extruir7 (cut)
    with BuildSketch(Plane(origin=(0, 0, -50.6), x_dir=(-1, 0, 0), z_dir=(0, 0, -1))):
        with Locations((-45.2, 36)):
            Circle(CROQUIS11_R)
        with Locations((-14.2, 36)):
            Circle(CROQUIS11_R)
        with Locations((-14.2, 5)):
            Circle(CROQUIS11_R)
        with Locations((-45.2, 5)):
            Circle(CROQUIS11_R)
    extrude(amount=-CORTAR_EXTRUIR7_DEPTH, mode=Mode.SUBTRACT)

    # Redondeo4
    redondeo4_edges = [part.edges().sort_by_distance(p)[0] for p in [
        (48.45, 5, -47.1),
        (17.45, 5, -47.1),
        (17.45, 36, -47.1),
        (48.45, 36, -47.1),
    ]]
    fillet(redondeo4_edges, radius=REDONDEO4_R)

    # Croquis12 → Cortar-Extruir9 (cut)
    # profile 1 of 6: a face of its own
    with BuildSketch(Plane(origin=(0, 59, 0), x_dir=(1, 0, 0), z_dir=(0, 1, 0))):
        with Locations((19.25, 44.9)):
            Rectangle(CROQUIS12_W, CROQUIS12_H)
        with Locations((19.25, 44.9)):
            Rectangle(CROQUIS12_W_2, CROQUIS12_H_2, mode=Mode.SUBTRACT)
    # profile 2 of 6: a face of its own
    with BuildSketch(Plane(origin=(0, 59, 0), x_dir=(1, 0, 0), z_dir=(0, 1, 0))):
        with Locations((40.15, 44.9)):
            Rectangle(CROQUIS12_W, CROQUIS12_H)
        with Locations((40.15, 44.9)):
            Rectangle(CROQUIS12_W_2, CROQUIS12_H_2, mode=Mode.SUBTRACT)
    # profile 3 of 6: a face of its own
    with BuildSketch(Plane(origin=(0, 59, 0), x_dir=(1, 0, 0), z_dir=(0, 1, 0))):
        with Locations((54.3, 29.05)):
            Rectangle(CROQUIS12_W_3, CROQUIS12_H_3)
        with Locations((54.3, 29.05)):
            Rectangle(CROQUIS12_W_4, CROQUIS12_H_4, mode=Mode.SUBTRACT)
    # profile 4 of 6: a face of its own
    with BuildSketch(Plane(origin=(0, 59, 0), x_dir=(1, 0, 0), z_dir=(0, 1, 0))):
        with Locations((54.3, 8.15)):
            Rectangle(CROQUIS12_W_3, CROQUIS12_H_3)
        with Locations((54.3, 8.15)):
            Rectangle(CROQUIS12_W_4, CROQUIS12_H_4, mode=Mode.SUBTRACT)
    # profile 5 of 6: a face of its own
    with BuildSketch(Plane(origin=(0, 59, 0), x_dir=(1, 0, 0), z_dir=(0, 1, 0))):
        with Locations((5.1, 8.15)):
            Rectangle(CROQUIS12_W_3, CROQUIS12_H_3)
        with Locations((5.1, 8.15)):
            Rectangle(CROQUIS12_W_4, CROQUIS12_H_4, mode=Mode.SUBTRACT)
    # profile 6 of 6: a face of its own
    with BuildSketch(Plane(origin=(0, 59, 0), x_dir=(1, 0, 0), z_dir=(0, 1, 0))):
        with Locations((5.1, 29.05)):
            Rectangle(CROQUIS12_W_3, CROQUIS12_H_3)
        with Locations((5.1, 29.05)):
            Rectangle(CROQUIS12_W_4, CROQUIS12_H_4, mode=Mode.SUBTRACT)
    extrude(amount=-CORTAR_EXTRUIR9_DEPTH, mode=Mode.SUBTRACT)

    # Redondeo5
    redondeo5_edges = [part.edges().sort_by_distance(p)[0] for p in [
        (48.45, 5, -50.6),
        (17.45, 5, -50.6),
        (17.45, 36, -50.6),
        (48.45, 36, -50.6),
    ]]
    fillet(redondeo5_edges, radius=REDONDEO5_R)


solid = part.part
